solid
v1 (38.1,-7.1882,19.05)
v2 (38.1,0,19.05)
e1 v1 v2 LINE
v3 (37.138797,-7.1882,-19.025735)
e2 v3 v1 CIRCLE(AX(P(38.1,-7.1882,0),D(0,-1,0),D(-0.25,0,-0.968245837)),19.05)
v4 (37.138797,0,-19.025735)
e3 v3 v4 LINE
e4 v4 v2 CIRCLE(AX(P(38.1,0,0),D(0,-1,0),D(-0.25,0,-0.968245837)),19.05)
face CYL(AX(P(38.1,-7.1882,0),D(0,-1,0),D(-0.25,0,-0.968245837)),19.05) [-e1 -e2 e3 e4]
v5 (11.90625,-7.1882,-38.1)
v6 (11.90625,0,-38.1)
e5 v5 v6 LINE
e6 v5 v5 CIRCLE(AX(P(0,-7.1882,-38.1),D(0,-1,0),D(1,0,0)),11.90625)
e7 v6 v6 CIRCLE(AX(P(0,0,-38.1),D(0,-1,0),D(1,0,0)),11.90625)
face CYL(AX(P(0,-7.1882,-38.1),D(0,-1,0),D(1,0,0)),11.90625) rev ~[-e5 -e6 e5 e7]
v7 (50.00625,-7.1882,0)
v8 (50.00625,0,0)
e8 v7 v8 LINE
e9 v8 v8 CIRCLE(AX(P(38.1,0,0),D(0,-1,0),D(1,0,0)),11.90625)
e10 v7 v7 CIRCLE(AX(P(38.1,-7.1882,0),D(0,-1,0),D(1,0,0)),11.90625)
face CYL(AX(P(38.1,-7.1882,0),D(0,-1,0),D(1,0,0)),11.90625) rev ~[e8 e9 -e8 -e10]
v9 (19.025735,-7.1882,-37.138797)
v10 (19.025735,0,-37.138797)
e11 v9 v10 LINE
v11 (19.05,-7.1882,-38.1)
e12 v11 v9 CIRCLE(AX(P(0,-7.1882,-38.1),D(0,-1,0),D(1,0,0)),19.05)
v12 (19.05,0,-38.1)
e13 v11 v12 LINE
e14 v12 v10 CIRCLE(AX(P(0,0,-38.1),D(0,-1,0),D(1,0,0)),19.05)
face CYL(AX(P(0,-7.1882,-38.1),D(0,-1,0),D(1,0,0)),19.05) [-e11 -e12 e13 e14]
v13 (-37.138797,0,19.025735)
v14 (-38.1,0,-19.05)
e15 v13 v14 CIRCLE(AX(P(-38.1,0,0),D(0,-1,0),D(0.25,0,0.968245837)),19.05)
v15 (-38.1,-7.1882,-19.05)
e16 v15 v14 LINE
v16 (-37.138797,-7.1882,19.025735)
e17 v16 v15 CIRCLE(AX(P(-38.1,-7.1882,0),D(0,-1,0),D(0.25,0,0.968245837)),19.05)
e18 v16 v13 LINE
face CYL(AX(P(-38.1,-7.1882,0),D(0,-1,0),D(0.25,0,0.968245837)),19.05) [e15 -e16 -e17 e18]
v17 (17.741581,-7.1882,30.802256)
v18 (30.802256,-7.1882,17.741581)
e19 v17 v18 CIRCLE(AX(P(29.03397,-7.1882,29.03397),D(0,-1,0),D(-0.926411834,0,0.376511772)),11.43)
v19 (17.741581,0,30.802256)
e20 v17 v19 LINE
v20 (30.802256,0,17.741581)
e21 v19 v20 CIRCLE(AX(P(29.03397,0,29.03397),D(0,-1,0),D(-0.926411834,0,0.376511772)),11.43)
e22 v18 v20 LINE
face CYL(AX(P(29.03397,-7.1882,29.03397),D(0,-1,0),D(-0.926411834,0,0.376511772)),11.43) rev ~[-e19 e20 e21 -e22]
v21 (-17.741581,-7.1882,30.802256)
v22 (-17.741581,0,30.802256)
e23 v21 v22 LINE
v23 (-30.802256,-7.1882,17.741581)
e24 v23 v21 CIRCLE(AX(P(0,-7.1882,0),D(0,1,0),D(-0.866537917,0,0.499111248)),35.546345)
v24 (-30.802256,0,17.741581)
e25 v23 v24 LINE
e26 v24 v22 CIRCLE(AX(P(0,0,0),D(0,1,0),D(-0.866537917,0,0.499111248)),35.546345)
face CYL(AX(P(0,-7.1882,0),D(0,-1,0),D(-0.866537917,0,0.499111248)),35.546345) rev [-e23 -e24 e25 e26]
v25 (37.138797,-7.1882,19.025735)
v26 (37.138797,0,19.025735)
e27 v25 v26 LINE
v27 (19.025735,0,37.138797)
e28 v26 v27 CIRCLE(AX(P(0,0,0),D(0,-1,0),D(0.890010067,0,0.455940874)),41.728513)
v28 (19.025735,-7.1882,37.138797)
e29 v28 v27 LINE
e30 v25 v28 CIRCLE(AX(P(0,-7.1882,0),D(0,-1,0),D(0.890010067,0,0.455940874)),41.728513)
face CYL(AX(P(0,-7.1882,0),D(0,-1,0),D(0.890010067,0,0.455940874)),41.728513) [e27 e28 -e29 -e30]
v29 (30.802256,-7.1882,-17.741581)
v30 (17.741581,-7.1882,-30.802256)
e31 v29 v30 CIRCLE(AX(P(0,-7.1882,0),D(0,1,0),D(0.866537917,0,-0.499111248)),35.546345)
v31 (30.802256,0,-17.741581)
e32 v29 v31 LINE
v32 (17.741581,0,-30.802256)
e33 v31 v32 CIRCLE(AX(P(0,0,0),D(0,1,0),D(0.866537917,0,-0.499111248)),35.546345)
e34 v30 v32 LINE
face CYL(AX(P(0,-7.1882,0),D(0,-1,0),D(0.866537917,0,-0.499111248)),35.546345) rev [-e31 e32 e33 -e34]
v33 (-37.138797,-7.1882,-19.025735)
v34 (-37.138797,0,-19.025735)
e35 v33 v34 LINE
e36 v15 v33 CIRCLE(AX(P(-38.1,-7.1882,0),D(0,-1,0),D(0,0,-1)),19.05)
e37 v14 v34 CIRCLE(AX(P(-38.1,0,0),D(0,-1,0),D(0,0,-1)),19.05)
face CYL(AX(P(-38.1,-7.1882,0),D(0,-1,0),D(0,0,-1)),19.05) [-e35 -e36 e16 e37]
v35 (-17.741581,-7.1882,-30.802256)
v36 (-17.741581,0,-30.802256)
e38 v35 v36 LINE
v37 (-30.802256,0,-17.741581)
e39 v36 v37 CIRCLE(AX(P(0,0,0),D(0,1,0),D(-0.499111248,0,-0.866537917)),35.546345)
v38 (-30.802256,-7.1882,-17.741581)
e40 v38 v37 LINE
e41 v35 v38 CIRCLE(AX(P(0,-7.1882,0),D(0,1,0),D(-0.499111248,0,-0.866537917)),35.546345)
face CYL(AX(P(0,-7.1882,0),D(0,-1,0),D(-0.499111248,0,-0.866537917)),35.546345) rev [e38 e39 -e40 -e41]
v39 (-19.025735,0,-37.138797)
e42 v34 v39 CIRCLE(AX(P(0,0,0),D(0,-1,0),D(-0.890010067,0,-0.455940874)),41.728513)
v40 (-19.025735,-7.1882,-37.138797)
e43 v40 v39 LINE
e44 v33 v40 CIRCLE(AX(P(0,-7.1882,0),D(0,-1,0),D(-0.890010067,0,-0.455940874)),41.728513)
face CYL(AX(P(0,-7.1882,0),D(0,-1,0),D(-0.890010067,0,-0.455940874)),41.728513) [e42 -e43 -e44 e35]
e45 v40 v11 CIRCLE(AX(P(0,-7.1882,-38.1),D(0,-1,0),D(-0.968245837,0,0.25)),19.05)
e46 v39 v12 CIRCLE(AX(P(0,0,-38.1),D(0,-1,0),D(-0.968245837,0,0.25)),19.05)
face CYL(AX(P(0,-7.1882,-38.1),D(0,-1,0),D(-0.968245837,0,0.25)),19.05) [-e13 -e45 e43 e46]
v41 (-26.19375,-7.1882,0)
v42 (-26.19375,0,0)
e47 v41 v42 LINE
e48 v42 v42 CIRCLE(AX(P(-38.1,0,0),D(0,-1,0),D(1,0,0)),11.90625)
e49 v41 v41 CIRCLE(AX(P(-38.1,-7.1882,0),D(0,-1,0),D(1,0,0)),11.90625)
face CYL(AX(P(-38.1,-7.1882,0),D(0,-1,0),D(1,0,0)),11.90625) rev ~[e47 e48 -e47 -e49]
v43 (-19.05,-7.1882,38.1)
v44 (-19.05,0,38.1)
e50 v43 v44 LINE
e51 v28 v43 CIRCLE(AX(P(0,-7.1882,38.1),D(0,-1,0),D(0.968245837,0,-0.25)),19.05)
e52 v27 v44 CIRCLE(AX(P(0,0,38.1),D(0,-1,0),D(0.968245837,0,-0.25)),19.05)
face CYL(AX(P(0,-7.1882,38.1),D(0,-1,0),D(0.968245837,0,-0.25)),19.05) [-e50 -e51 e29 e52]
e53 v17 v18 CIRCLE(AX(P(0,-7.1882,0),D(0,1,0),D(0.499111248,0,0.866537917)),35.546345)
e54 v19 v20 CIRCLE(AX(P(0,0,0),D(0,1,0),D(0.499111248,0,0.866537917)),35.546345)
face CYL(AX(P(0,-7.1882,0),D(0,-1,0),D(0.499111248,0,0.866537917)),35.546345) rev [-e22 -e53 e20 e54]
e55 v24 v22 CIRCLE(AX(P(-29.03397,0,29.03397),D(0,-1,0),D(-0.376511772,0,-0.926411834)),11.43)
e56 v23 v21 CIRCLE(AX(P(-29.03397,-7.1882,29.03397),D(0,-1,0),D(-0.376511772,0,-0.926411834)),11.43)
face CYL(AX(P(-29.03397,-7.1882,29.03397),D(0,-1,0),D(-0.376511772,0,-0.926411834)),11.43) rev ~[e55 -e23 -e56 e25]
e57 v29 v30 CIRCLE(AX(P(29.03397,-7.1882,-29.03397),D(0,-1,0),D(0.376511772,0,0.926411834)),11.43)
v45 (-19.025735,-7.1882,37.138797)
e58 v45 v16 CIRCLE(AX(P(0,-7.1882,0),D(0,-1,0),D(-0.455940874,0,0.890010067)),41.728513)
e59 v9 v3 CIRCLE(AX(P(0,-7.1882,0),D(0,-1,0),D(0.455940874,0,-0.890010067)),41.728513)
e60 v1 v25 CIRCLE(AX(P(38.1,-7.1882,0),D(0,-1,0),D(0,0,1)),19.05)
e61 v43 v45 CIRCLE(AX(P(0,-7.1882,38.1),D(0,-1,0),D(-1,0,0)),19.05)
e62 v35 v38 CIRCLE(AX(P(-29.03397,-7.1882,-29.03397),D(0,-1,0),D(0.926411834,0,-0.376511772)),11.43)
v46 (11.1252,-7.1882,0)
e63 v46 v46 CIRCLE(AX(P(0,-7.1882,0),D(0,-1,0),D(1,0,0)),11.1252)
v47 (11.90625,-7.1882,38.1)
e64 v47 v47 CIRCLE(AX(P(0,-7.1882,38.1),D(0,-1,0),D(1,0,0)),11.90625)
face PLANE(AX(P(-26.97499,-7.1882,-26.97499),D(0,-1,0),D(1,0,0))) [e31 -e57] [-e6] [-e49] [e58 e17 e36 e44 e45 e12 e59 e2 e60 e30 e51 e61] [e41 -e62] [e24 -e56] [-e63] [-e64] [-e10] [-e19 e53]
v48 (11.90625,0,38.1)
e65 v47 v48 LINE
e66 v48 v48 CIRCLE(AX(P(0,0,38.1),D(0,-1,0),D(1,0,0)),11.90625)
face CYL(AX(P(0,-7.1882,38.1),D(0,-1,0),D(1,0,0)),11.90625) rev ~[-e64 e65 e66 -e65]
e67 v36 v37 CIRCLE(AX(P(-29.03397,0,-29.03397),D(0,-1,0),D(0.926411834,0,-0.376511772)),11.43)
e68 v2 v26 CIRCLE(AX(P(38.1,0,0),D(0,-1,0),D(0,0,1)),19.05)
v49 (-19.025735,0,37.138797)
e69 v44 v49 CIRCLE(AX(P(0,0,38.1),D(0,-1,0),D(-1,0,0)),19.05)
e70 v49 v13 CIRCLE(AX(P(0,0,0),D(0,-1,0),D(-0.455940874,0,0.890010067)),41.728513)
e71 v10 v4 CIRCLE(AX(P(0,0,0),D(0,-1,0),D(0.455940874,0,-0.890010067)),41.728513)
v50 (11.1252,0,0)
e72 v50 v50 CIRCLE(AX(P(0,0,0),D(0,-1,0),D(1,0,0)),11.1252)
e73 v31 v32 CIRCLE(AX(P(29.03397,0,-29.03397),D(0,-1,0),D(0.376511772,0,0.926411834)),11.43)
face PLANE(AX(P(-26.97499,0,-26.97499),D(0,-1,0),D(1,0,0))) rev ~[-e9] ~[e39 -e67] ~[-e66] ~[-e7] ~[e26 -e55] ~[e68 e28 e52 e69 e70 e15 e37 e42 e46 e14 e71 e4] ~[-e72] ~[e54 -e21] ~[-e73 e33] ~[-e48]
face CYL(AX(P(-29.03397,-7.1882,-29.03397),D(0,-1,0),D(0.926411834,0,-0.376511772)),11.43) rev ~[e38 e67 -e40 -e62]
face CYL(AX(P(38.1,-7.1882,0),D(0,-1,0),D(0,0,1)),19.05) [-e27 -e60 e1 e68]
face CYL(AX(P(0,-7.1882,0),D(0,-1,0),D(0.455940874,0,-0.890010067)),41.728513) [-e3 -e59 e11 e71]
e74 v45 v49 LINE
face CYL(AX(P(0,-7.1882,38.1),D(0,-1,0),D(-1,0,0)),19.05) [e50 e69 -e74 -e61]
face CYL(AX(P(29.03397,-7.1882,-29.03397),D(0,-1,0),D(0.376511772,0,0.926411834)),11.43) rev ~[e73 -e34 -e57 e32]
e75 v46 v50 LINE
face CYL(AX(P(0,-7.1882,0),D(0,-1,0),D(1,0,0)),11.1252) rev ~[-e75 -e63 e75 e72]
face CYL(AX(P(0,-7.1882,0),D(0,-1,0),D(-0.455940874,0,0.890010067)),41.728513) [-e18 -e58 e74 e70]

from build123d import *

# Parameters (mm, degrees)
F0_R            = 38.1
F1_DEPTH        = 7.1882
F2_R            = 11.1252
F3_DEPTH        = 7.62
F5_DEPTH        = 7.1882
F5_COPIES_COUNT = 4
F7_DEPTH        = 25.4
F9_DEPTH        = 7.1882
F10_R           = 11.90625
F11_DEPTH       = 25.4


# Not quite as in the source:
# - a pattern or mirror of a feature is missing from the dataset's text; its kind, count and spacing are read off the source's solid


with BuildPart() as f1:
    # F0 (on Front) → F1 (new body)
    with BuildSketch(Plane.XZ):
        Circle(F0_R)
    extrude(amount=F1_DEPTH)

    # F2 (on face) → F3 (cut)
    with BuildSketch(Plane.XZ.offset(7.1882)):
        Circle(F2_R)
    extrude(amount=-F3_DEPTH, mode=Mode.SUBTRACT)

    # F4 (on face) → F5 (join)
    with BuildSketch(Plane.XZ.offset(7.1882)):
        with BuildLine():
            ThreePointArc((-18.4450831863, 33.3375), (0, 19.05), (18.4450831863, 33.3375))
            ThreePointArc((18.4450831863, 33.3375), (0, 38.1), (-18.4450831863, 33.3375))
        make_face()
        with BuildLine():
            ThreePointArc((-19.05, 0), (-23.0396526434, 11.6656949), (-33.3375, 18.4450831863))
            ThreePointArc((-33.3375, 18.4450831863), (-38.1, 0), (-33.3375, -18.4450831863))
            ThreePointArc((-33.3375, -18.4450831863), (-23.0396526434, -11.6656949), (-19.05, 0))
        make_face()
        with BuildLine():
            ThreePointArc((19.05, -38.1), (18.8981657139, -35.6996182282), (18.4450831863, -33.3375))
            ThreePointArc((18.4450831863, -33.3375), (0, -38.1), (-18.4450831863, -33.3375))
            ThreePointArc((-18.4450831863, -33.3375), (-2.4003817718, -56.9981657139), (19.05, -38.1))
        make_face()
        with BuildLine():
            ThreePointArc((38.1, 0), (36.8901663726, 9.525), (33.3375, 18.4450831863))
            ThreePointArc((33.3375, 18.4450831863), (19.05, 0), (33.3375, -18.4450831863))
            ThreePointArc((33.3375, -18.4450831863), (36.8901663726, -9.525), (38.1, 0))
        make_face()
    f5 = extrude(amount=-F5_DEPTH)

    # F5_copies: F5 ×4 about axis
    f5_copies_axis = Axis((0, 0, 0), (0, 1, 0))
    for i in range(1, F5_COPIES_COUNT):
        add(f5.rotate(f5_copies_axis, i * 360 / F5_COPIES_COUNT))

    # F6 (on face) → F7 (cut)
    with BuildSketch(Plane.XZ.offset(7.1882)):
        with BuildLine():
            ThreePointArc((-33.3375, 18.4450831863), (-20.9517399354, 20.9517399354), (-18.4450831863, 33.3375))
            ThreePointArc((-18.4450831863, 33.3375), (-26.9407683632, 26.9407683632), (-33.3375, 18.4450831863))
        make_face()
        with BuildLine():
            ThreePointArc((-18.4450831863, -33.3375), (-20.9517399354, -20.9517399354), (-33.3375, -18.4450831863))
            ThreePointArc((-33.3375, -18.4450831863), (-26.9407683632, -26.9407683632), (-18.4450831863, -33.3375))
        make_face()
        with BuildLine():
            ThreePointArc((18.4450831863, -33.3375), (26.9407683632, -26.9407683632), (33.3375, -18.4450831863))
            ThreePointArc((33.3375, -18.4450831863), (20.9517399354, -20.9517399354), (18.4450831863, -33.3375))
        make_face()
        with BuildLine():
            ThreePointArc((33.3375, 18.4450831863), (26.9407683632, 26.9407683632), (18.4450831863, 33.3375))
            ThreePointArc((18.4450831863, 33.3375), (20.9517399354, 20.9517399354), (33.3375, 18.4450831863))
        make_face()
    extrude(amount=-F7_DEPTH, mode=Mode.SUBTRACT)

    # F8 (on face) → F9 (join)
    with BuildSketch(Plane.XZ.offset(7.1882)):
        with BuildLine():
            ThreePointArc((-37.1387970886, -19.0257349126), (-29.5065148582, -29.5065148582), (-19.0257349126, -37.1387970886))
            ThreePointArc((-19.0257349126, -37.1387970886), (-18.831569694, -35.2234599149), (-18.4450831863, -33.3375))
            ThreePointArc((-18.4450831863, -33.3375), (-18.0201411063, -32.0901876015), (-17.7415806811, -30.8022558951))
            ThreePointArc((-17.7415806811, -30.8022558951), (-25.1350616996, -25.1350616996), (-30.8022558951, -17.7415806811))
            ThreePointArc((-30.8022558951, -17.7415806811), (-32.0901876015, -18.0201411063), (-33.3375, -18.4450831863))
            ThreePointArc((-33.3375, -18.4450831863), (-35.2234599149, -18.831569694), (-37.1387970886, -19.0257349126))
        make_face()
        with BuildLine():
            ThreePointArc((19.0257349126, -37.1387970886), (29.5065148582, -29.5065148582), (37.1387970886, -19.0257349126))
            ThreePointArc((37.1387970886, -19.0257349126), (35.2234599149, -18.831569694), (33.3375, -18.4450831863))
            ThreePointArc((33.3375, -18.4450831863), (32.0901876015, -18.0201411063), (30.8022558951, -17.7415806811))
            ThreePointArc((30.8022558951, -17.7415806811), (25.1350616996, -25.1350616996), (17.7415806811, -30.8022558951))
            ThreePointArc((17.7415806811, -30.8022558951), (18.0201411063, -32.0901876015), (18.4450831863, -33.3375))
            ThreePointArc((18.4450831863, -33.3375), (18.831569694, -35.2234599149), (19.0257349126, -37.1387970886))
        make_face()
        with BuildLine():
            ThreePointArc((33.3375, 18.4450831863), (35.2234599149, 18.831569694), (37.1387970886, 19.0257349126))
            ThreePointArc((37.1387970886, 19.0257349126), (29.5065148582, 29.5065148582), (19.0257349126, 37.1387970886))
            ThreePointArc((19.0257349126, 37.1387970886), (18.831569694, 35.2234599149), (18.4450831863, 33.3375))
            ThreePointArc((18.4450831863, 33.3375), (18.0201411063, 32.0901876015), (17.7415806811, 30.8022558951))
            ThreePointArc((17.7415806811, 30.8022558951), (25.1350616996, 25.1350616996), (30.8022558951, 17.7415806811))
            ThreePointArc((30.8022558951, 17.7415806811), (32.0901876015, 18.0201411063), (33.3375, 18.4450831863))
        make_face()
        with BuildLine():
            ThreePointArc((-18.4450831863, 33.3375), (-18.831569694, 35.2234599149), (-19.0257349126, 37.1387970886))
            ThreePointArc((-19.0257349126, 37.1387970886), (-29.5065148582, 29.5065148582), (-37.1387970886, 19.0257349126))
            ThreePointArc((-37.1387970886, 19.0257349126), (-35.2234599149, 18.831569694), (-33.3375, 18.4450831863))
            ThreePointArc((-33.3375, 18.4450831863), (-32.0901876015, 18.0201411063), (-30.8022558951, 17.7415806811))
            ThreePointArc((-30.8022558951, 17.7415806811), (-25.1350616996, 25.1350616996), (-17.7415806811, 30.8022558951))
            ThreePointArc((-17.7415806811, 30.8022558951), (-18.0201411063, 32.0901876015), (-18.4450831863, 33.3375))
        make_face()
    extrude(amount=-F9_DEPTH)

    # F10 (on face) → F11 (cut)
    with BuildSketch(Plane.XZ.offset(7.1882)):
        with Locations((-38.1, 0)):
            Circle(F10_R)
        with Locations((0, 38.1)):
            Circle(F10_R)
        with Locations((38.1, 0)):
            Circle(F10_R)
        with Locations((0, -38.1)):
            Circle(F10_R)
    extrude(amount=-F11_DEPTH, mode=Mode.SUBTRACT)


solid = f1.part
